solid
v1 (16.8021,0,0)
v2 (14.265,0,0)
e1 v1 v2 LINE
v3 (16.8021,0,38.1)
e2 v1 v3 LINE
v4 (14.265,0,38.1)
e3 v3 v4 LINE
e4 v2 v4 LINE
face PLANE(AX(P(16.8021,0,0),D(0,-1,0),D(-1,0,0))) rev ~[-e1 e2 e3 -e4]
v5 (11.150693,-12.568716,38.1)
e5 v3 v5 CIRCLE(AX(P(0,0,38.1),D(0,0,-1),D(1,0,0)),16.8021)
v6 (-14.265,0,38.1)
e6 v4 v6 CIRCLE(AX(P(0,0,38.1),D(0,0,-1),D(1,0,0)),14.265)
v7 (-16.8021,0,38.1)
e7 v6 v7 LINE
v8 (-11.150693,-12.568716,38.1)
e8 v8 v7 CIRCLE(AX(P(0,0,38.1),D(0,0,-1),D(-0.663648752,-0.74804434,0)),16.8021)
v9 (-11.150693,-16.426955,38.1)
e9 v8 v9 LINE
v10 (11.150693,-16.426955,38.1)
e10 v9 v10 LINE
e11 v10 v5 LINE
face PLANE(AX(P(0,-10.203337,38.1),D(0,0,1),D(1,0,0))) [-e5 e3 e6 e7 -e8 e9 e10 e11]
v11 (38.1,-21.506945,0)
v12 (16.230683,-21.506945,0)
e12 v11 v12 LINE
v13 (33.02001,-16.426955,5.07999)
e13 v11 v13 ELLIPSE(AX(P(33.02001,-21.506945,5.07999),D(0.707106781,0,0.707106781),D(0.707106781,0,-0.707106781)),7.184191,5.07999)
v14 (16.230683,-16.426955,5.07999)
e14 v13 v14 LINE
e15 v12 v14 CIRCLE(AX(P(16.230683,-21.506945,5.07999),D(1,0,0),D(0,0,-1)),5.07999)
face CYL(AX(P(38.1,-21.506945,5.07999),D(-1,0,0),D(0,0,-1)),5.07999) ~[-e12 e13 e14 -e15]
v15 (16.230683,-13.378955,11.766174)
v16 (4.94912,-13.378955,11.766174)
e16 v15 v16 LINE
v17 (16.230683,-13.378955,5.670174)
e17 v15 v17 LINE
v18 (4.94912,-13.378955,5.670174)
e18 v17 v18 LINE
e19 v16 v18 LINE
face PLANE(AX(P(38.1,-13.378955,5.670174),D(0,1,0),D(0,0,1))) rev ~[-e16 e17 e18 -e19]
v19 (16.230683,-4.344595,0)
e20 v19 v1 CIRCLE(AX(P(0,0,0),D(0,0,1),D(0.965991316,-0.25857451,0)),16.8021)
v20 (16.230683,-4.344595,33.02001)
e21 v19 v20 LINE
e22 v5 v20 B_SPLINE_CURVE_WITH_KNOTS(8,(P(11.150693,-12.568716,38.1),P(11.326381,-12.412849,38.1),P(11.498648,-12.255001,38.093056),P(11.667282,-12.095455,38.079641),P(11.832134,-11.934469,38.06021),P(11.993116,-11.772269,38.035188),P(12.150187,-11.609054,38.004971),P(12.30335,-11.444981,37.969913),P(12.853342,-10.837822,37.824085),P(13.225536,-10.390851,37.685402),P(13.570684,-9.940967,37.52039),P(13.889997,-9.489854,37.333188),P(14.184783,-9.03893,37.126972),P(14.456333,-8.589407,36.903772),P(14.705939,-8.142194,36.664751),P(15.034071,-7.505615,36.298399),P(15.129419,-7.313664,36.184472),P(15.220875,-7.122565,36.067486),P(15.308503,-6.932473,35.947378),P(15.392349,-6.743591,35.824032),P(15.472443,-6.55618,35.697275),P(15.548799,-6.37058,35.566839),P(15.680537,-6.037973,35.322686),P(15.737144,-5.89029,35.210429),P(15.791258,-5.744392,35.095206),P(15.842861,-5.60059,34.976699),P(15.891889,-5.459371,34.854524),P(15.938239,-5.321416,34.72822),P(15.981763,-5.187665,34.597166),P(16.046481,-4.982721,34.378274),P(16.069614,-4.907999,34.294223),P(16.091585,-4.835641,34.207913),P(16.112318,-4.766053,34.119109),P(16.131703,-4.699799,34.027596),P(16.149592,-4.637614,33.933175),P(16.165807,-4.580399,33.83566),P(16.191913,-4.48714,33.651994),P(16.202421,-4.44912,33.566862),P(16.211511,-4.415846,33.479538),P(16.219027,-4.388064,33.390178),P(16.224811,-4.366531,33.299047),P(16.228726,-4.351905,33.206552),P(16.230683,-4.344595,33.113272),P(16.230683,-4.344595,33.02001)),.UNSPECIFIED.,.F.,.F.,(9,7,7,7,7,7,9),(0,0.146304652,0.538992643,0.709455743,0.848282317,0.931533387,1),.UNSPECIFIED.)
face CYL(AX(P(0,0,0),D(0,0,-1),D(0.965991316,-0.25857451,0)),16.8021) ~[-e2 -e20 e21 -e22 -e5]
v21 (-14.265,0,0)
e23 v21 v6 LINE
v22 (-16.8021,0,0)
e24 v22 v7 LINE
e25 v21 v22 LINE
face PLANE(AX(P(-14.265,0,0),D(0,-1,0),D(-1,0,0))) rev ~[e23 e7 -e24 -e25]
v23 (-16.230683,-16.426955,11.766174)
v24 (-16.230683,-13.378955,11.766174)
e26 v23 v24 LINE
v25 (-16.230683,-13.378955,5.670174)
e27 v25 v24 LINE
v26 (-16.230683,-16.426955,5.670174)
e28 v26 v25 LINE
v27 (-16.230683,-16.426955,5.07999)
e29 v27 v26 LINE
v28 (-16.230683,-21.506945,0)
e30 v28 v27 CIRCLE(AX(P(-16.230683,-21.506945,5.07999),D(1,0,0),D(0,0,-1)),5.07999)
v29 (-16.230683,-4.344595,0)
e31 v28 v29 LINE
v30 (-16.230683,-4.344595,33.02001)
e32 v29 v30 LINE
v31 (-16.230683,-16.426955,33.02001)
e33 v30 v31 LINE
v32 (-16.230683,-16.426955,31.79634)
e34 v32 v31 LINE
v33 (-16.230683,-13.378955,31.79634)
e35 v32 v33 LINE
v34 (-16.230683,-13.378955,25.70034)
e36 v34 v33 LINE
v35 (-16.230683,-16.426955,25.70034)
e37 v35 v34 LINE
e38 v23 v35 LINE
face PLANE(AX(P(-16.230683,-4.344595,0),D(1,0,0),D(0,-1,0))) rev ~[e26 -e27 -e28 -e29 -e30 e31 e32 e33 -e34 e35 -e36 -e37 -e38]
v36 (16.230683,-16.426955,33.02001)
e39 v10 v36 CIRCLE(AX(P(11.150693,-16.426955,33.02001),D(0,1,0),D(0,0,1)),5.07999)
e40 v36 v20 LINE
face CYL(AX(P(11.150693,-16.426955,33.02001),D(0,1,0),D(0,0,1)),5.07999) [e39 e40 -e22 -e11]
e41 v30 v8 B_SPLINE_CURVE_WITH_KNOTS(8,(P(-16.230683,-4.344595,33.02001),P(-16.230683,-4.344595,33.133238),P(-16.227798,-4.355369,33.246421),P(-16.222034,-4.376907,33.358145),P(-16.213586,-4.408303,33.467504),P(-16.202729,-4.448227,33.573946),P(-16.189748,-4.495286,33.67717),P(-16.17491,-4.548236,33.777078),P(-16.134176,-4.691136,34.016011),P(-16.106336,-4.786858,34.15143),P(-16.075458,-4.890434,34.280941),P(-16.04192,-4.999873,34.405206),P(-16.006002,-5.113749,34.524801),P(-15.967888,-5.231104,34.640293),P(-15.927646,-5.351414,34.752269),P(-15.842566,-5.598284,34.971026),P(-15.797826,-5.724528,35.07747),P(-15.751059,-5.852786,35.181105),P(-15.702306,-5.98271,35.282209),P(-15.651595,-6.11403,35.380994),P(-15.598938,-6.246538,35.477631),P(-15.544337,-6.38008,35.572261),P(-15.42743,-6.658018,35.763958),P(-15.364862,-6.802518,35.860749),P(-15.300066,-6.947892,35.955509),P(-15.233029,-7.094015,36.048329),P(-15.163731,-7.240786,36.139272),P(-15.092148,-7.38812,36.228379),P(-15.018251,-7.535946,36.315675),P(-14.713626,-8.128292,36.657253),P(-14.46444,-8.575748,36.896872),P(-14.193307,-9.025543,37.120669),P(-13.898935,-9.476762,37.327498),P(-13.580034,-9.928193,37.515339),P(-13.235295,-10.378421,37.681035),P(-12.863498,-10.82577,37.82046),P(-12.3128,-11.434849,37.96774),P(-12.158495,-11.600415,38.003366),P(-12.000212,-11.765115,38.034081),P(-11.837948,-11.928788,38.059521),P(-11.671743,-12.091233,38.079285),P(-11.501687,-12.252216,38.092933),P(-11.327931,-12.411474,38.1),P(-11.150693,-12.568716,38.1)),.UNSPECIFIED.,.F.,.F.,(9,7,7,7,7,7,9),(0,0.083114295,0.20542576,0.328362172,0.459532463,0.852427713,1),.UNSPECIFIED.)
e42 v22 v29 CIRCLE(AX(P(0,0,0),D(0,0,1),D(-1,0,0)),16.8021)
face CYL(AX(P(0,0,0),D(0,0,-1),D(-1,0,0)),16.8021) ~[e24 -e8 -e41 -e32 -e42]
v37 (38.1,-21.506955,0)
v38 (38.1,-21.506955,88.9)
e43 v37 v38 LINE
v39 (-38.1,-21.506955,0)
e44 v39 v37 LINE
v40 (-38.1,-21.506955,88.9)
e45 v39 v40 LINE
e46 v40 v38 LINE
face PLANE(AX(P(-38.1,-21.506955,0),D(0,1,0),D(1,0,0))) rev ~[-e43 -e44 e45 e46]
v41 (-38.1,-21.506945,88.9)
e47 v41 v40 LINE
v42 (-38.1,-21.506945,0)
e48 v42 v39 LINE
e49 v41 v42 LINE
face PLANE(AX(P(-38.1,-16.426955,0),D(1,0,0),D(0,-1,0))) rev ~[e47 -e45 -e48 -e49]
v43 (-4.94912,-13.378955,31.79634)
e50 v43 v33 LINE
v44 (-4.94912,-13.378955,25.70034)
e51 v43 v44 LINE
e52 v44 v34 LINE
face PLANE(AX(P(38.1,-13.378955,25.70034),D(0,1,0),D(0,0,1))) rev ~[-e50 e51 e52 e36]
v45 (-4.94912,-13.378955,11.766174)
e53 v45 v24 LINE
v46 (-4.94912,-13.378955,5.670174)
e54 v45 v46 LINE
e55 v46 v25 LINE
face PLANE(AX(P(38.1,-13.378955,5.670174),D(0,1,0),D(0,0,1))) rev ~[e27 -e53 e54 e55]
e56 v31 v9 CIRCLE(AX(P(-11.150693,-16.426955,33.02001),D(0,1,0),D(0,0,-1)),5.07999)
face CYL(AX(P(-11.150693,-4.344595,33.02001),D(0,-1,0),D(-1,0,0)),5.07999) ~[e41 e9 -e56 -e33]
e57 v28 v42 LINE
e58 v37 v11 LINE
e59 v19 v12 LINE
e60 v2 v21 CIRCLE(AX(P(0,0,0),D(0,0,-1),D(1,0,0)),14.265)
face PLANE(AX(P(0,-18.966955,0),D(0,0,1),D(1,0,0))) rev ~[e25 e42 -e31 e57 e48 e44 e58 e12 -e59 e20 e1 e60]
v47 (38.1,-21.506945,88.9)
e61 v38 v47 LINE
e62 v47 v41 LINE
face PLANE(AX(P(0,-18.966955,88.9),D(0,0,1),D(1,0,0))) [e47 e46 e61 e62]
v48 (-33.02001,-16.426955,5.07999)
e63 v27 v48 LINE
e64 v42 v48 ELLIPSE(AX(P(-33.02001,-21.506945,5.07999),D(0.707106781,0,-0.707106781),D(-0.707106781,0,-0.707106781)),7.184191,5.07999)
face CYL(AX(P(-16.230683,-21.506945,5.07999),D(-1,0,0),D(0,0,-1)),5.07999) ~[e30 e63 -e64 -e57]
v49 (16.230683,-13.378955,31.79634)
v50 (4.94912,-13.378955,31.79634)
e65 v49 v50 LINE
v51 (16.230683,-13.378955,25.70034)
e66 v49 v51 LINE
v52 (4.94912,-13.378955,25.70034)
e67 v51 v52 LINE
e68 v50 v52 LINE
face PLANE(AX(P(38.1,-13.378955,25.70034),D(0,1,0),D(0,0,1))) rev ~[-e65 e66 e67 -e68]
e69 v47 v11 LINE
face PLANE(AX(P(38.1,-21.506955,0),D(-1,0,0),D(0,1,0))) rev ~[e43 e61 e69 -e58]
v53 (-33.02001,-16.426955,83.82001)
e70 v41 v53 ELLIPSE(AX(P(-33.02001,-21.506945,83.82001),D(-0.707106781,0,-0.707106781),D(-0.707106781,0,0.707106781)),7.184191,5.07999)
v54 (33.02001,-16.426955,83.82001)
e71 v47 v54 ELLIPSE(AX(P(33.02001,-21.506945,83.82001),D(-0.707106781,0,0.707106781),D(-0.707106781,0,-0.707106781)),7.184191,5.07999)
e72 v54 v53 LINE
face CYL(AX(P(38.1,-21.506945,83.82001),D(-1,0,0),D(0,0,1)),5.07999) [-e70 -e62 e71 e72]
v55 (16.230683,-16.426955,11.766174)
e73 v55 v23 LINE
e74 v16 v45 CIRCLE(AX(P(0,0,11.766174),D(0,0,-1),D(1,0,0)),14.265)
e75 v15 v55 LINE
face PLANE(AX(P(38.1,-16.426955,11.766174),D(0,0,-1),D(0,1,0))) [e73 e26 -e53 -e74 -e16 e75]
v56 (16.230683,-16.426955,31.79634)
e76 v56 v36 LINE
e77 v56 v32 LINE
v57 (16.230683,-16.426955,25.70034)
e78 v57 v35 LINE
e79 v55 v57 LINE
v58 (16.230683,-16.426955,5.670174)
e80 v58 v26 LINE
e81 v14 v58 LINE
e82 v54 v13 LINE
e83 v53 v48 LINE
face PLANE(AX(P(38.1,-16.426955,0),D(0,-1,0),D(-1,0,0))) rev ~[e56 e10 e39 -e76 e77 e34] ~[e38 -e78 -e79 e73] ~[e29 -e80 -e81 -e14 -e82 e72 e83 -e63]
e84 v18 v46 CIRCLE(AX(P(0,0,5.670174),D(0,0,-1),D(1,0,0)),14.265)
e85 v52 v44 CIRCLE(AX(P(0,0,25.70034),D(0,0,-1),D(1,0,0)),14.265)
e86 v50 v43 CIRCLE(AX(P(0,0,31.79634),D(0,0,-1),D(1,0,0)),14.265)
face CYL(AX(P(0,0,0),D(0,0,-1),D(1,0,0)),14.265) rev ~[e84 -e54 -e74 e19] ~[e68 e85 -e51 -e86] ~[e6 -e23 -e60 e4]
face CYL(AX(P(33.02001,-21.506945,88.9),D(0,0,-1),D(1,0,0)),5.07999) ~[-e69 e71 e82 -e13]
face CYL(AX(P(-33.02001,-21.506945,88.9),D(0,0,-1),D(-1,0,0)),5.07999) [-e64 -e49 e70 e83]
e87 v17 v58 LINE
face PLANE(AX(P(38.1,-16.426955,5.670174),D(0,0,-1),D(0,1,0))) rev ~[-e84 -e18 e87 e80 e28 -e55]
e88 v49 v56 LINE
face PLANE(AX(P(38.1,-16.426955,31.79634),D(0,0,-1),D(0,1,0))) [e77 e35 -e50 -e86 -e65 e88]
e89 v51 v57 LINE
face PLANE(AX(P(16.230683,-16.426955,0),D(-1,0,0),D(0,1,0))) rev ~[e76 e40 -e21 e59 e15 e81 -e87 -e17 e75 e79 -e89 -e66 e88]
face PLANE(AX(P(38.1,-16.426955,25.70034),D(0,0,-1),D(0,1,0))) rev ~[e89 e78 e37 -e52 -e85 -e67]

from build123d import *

# Parameters (mm, degrees)
F1_DEPTH = 88.9
F2_DEPTH = 38.1
F3_W     = 3.048
F3_H     = 6.096
F4_DEPTH = 76.201
F5_R     = 5.07999


# Not quite as in the source:
# - a fillet or chamfer is up to 0.001 mm smaller than in the source, because OpenCascade refuses the exact size


with BuildPart() as f1:
    # F0 (on Top) → F1 (new body)
    with BuildSketch(Plane.XY):
        Polygon((-3.5306826939, -16.4269548038), (-16.2306826939, -16.4269548038), (-38.1, -16.4269548038), (-38.1, -21.5069548038), (38.1, -21.5069548038), (38.1, -16.4269548038), (16.2306826939, -16.4269548038), (3.5306826939, -16.4269548038), align=None)
    extrude(amount=F1_DEPTH)

    # F0 (on Top) → F2 (join)
    with BuildSketch(Plane.XY):
        with BuildLine():
            ThreePointArc((14.265, 0), (0, -14.265), (-14.265, 0))
            Line((-14.265, 0), (-16.8021, 0))
            ThreePointArc((-16.8021, 0), (-16.6586331687, -2.1910055589), (-16.2306826939, -4.344594768))
            Line((-16.2306826939, -4.344594768), (-16.2306826939, -16.4269548038))
            Line((-16.2306826939, -16.4269548038), (-3.5306826939, -16.4269548038))
            Line((-3.5306826939, -16.4269548038), (3.5306826939, -16.4269548038))
            Line((3.5306826939, -16.4269548038), (16.2306826939, -16.4269548038))
            Line((16.2306826939, -16.4269548038), (16.2306826939, -4.344594768))
            ThreePointArc((16.2306826939, -4.344594768), (16.6586331687, -2.1910055589), (16.8021, 0))
            Line((16.8021, 0), (14.265, 0))
        make_face()
    extrude(amount=F2_DEPTH)

    # F3 (on face) → F4 (cut, through all)
    with BuildSketch(Plane.YZ.offset(38.1)):
        with Locations((-14.9029548038, 8.7181735593)):
            Rectangle(F3_W, F3_H)
        with Locations((-14.9029548038, 28.7483400475)):
            Rectangle(F3_W, F3_H)
    extrude(amount=-F4_DEPTH, mode=Mode.SUBTRACT)

    # F5 (radius 5.08 in the source; OpenCascade refuses exactly that, so slightly less here)
    f5_edges = [f1.edges().sort_by_distance(p)[0] for p in [
        (0, -16.426955, 88.9),
        (38.1, -16.426955, 44.45),
        (27.165341, -16.426955, 0),
        (-38.1, -16.426955, 44.45),
        (-27.165341, -16.426955, 0),
        (16.230683, -10.385775, 38.1),
        (-16.230683, -10.385775, 38.1),
    ]]
    fillet(f5_edges, radius=F5_R)


solid = f1.part
